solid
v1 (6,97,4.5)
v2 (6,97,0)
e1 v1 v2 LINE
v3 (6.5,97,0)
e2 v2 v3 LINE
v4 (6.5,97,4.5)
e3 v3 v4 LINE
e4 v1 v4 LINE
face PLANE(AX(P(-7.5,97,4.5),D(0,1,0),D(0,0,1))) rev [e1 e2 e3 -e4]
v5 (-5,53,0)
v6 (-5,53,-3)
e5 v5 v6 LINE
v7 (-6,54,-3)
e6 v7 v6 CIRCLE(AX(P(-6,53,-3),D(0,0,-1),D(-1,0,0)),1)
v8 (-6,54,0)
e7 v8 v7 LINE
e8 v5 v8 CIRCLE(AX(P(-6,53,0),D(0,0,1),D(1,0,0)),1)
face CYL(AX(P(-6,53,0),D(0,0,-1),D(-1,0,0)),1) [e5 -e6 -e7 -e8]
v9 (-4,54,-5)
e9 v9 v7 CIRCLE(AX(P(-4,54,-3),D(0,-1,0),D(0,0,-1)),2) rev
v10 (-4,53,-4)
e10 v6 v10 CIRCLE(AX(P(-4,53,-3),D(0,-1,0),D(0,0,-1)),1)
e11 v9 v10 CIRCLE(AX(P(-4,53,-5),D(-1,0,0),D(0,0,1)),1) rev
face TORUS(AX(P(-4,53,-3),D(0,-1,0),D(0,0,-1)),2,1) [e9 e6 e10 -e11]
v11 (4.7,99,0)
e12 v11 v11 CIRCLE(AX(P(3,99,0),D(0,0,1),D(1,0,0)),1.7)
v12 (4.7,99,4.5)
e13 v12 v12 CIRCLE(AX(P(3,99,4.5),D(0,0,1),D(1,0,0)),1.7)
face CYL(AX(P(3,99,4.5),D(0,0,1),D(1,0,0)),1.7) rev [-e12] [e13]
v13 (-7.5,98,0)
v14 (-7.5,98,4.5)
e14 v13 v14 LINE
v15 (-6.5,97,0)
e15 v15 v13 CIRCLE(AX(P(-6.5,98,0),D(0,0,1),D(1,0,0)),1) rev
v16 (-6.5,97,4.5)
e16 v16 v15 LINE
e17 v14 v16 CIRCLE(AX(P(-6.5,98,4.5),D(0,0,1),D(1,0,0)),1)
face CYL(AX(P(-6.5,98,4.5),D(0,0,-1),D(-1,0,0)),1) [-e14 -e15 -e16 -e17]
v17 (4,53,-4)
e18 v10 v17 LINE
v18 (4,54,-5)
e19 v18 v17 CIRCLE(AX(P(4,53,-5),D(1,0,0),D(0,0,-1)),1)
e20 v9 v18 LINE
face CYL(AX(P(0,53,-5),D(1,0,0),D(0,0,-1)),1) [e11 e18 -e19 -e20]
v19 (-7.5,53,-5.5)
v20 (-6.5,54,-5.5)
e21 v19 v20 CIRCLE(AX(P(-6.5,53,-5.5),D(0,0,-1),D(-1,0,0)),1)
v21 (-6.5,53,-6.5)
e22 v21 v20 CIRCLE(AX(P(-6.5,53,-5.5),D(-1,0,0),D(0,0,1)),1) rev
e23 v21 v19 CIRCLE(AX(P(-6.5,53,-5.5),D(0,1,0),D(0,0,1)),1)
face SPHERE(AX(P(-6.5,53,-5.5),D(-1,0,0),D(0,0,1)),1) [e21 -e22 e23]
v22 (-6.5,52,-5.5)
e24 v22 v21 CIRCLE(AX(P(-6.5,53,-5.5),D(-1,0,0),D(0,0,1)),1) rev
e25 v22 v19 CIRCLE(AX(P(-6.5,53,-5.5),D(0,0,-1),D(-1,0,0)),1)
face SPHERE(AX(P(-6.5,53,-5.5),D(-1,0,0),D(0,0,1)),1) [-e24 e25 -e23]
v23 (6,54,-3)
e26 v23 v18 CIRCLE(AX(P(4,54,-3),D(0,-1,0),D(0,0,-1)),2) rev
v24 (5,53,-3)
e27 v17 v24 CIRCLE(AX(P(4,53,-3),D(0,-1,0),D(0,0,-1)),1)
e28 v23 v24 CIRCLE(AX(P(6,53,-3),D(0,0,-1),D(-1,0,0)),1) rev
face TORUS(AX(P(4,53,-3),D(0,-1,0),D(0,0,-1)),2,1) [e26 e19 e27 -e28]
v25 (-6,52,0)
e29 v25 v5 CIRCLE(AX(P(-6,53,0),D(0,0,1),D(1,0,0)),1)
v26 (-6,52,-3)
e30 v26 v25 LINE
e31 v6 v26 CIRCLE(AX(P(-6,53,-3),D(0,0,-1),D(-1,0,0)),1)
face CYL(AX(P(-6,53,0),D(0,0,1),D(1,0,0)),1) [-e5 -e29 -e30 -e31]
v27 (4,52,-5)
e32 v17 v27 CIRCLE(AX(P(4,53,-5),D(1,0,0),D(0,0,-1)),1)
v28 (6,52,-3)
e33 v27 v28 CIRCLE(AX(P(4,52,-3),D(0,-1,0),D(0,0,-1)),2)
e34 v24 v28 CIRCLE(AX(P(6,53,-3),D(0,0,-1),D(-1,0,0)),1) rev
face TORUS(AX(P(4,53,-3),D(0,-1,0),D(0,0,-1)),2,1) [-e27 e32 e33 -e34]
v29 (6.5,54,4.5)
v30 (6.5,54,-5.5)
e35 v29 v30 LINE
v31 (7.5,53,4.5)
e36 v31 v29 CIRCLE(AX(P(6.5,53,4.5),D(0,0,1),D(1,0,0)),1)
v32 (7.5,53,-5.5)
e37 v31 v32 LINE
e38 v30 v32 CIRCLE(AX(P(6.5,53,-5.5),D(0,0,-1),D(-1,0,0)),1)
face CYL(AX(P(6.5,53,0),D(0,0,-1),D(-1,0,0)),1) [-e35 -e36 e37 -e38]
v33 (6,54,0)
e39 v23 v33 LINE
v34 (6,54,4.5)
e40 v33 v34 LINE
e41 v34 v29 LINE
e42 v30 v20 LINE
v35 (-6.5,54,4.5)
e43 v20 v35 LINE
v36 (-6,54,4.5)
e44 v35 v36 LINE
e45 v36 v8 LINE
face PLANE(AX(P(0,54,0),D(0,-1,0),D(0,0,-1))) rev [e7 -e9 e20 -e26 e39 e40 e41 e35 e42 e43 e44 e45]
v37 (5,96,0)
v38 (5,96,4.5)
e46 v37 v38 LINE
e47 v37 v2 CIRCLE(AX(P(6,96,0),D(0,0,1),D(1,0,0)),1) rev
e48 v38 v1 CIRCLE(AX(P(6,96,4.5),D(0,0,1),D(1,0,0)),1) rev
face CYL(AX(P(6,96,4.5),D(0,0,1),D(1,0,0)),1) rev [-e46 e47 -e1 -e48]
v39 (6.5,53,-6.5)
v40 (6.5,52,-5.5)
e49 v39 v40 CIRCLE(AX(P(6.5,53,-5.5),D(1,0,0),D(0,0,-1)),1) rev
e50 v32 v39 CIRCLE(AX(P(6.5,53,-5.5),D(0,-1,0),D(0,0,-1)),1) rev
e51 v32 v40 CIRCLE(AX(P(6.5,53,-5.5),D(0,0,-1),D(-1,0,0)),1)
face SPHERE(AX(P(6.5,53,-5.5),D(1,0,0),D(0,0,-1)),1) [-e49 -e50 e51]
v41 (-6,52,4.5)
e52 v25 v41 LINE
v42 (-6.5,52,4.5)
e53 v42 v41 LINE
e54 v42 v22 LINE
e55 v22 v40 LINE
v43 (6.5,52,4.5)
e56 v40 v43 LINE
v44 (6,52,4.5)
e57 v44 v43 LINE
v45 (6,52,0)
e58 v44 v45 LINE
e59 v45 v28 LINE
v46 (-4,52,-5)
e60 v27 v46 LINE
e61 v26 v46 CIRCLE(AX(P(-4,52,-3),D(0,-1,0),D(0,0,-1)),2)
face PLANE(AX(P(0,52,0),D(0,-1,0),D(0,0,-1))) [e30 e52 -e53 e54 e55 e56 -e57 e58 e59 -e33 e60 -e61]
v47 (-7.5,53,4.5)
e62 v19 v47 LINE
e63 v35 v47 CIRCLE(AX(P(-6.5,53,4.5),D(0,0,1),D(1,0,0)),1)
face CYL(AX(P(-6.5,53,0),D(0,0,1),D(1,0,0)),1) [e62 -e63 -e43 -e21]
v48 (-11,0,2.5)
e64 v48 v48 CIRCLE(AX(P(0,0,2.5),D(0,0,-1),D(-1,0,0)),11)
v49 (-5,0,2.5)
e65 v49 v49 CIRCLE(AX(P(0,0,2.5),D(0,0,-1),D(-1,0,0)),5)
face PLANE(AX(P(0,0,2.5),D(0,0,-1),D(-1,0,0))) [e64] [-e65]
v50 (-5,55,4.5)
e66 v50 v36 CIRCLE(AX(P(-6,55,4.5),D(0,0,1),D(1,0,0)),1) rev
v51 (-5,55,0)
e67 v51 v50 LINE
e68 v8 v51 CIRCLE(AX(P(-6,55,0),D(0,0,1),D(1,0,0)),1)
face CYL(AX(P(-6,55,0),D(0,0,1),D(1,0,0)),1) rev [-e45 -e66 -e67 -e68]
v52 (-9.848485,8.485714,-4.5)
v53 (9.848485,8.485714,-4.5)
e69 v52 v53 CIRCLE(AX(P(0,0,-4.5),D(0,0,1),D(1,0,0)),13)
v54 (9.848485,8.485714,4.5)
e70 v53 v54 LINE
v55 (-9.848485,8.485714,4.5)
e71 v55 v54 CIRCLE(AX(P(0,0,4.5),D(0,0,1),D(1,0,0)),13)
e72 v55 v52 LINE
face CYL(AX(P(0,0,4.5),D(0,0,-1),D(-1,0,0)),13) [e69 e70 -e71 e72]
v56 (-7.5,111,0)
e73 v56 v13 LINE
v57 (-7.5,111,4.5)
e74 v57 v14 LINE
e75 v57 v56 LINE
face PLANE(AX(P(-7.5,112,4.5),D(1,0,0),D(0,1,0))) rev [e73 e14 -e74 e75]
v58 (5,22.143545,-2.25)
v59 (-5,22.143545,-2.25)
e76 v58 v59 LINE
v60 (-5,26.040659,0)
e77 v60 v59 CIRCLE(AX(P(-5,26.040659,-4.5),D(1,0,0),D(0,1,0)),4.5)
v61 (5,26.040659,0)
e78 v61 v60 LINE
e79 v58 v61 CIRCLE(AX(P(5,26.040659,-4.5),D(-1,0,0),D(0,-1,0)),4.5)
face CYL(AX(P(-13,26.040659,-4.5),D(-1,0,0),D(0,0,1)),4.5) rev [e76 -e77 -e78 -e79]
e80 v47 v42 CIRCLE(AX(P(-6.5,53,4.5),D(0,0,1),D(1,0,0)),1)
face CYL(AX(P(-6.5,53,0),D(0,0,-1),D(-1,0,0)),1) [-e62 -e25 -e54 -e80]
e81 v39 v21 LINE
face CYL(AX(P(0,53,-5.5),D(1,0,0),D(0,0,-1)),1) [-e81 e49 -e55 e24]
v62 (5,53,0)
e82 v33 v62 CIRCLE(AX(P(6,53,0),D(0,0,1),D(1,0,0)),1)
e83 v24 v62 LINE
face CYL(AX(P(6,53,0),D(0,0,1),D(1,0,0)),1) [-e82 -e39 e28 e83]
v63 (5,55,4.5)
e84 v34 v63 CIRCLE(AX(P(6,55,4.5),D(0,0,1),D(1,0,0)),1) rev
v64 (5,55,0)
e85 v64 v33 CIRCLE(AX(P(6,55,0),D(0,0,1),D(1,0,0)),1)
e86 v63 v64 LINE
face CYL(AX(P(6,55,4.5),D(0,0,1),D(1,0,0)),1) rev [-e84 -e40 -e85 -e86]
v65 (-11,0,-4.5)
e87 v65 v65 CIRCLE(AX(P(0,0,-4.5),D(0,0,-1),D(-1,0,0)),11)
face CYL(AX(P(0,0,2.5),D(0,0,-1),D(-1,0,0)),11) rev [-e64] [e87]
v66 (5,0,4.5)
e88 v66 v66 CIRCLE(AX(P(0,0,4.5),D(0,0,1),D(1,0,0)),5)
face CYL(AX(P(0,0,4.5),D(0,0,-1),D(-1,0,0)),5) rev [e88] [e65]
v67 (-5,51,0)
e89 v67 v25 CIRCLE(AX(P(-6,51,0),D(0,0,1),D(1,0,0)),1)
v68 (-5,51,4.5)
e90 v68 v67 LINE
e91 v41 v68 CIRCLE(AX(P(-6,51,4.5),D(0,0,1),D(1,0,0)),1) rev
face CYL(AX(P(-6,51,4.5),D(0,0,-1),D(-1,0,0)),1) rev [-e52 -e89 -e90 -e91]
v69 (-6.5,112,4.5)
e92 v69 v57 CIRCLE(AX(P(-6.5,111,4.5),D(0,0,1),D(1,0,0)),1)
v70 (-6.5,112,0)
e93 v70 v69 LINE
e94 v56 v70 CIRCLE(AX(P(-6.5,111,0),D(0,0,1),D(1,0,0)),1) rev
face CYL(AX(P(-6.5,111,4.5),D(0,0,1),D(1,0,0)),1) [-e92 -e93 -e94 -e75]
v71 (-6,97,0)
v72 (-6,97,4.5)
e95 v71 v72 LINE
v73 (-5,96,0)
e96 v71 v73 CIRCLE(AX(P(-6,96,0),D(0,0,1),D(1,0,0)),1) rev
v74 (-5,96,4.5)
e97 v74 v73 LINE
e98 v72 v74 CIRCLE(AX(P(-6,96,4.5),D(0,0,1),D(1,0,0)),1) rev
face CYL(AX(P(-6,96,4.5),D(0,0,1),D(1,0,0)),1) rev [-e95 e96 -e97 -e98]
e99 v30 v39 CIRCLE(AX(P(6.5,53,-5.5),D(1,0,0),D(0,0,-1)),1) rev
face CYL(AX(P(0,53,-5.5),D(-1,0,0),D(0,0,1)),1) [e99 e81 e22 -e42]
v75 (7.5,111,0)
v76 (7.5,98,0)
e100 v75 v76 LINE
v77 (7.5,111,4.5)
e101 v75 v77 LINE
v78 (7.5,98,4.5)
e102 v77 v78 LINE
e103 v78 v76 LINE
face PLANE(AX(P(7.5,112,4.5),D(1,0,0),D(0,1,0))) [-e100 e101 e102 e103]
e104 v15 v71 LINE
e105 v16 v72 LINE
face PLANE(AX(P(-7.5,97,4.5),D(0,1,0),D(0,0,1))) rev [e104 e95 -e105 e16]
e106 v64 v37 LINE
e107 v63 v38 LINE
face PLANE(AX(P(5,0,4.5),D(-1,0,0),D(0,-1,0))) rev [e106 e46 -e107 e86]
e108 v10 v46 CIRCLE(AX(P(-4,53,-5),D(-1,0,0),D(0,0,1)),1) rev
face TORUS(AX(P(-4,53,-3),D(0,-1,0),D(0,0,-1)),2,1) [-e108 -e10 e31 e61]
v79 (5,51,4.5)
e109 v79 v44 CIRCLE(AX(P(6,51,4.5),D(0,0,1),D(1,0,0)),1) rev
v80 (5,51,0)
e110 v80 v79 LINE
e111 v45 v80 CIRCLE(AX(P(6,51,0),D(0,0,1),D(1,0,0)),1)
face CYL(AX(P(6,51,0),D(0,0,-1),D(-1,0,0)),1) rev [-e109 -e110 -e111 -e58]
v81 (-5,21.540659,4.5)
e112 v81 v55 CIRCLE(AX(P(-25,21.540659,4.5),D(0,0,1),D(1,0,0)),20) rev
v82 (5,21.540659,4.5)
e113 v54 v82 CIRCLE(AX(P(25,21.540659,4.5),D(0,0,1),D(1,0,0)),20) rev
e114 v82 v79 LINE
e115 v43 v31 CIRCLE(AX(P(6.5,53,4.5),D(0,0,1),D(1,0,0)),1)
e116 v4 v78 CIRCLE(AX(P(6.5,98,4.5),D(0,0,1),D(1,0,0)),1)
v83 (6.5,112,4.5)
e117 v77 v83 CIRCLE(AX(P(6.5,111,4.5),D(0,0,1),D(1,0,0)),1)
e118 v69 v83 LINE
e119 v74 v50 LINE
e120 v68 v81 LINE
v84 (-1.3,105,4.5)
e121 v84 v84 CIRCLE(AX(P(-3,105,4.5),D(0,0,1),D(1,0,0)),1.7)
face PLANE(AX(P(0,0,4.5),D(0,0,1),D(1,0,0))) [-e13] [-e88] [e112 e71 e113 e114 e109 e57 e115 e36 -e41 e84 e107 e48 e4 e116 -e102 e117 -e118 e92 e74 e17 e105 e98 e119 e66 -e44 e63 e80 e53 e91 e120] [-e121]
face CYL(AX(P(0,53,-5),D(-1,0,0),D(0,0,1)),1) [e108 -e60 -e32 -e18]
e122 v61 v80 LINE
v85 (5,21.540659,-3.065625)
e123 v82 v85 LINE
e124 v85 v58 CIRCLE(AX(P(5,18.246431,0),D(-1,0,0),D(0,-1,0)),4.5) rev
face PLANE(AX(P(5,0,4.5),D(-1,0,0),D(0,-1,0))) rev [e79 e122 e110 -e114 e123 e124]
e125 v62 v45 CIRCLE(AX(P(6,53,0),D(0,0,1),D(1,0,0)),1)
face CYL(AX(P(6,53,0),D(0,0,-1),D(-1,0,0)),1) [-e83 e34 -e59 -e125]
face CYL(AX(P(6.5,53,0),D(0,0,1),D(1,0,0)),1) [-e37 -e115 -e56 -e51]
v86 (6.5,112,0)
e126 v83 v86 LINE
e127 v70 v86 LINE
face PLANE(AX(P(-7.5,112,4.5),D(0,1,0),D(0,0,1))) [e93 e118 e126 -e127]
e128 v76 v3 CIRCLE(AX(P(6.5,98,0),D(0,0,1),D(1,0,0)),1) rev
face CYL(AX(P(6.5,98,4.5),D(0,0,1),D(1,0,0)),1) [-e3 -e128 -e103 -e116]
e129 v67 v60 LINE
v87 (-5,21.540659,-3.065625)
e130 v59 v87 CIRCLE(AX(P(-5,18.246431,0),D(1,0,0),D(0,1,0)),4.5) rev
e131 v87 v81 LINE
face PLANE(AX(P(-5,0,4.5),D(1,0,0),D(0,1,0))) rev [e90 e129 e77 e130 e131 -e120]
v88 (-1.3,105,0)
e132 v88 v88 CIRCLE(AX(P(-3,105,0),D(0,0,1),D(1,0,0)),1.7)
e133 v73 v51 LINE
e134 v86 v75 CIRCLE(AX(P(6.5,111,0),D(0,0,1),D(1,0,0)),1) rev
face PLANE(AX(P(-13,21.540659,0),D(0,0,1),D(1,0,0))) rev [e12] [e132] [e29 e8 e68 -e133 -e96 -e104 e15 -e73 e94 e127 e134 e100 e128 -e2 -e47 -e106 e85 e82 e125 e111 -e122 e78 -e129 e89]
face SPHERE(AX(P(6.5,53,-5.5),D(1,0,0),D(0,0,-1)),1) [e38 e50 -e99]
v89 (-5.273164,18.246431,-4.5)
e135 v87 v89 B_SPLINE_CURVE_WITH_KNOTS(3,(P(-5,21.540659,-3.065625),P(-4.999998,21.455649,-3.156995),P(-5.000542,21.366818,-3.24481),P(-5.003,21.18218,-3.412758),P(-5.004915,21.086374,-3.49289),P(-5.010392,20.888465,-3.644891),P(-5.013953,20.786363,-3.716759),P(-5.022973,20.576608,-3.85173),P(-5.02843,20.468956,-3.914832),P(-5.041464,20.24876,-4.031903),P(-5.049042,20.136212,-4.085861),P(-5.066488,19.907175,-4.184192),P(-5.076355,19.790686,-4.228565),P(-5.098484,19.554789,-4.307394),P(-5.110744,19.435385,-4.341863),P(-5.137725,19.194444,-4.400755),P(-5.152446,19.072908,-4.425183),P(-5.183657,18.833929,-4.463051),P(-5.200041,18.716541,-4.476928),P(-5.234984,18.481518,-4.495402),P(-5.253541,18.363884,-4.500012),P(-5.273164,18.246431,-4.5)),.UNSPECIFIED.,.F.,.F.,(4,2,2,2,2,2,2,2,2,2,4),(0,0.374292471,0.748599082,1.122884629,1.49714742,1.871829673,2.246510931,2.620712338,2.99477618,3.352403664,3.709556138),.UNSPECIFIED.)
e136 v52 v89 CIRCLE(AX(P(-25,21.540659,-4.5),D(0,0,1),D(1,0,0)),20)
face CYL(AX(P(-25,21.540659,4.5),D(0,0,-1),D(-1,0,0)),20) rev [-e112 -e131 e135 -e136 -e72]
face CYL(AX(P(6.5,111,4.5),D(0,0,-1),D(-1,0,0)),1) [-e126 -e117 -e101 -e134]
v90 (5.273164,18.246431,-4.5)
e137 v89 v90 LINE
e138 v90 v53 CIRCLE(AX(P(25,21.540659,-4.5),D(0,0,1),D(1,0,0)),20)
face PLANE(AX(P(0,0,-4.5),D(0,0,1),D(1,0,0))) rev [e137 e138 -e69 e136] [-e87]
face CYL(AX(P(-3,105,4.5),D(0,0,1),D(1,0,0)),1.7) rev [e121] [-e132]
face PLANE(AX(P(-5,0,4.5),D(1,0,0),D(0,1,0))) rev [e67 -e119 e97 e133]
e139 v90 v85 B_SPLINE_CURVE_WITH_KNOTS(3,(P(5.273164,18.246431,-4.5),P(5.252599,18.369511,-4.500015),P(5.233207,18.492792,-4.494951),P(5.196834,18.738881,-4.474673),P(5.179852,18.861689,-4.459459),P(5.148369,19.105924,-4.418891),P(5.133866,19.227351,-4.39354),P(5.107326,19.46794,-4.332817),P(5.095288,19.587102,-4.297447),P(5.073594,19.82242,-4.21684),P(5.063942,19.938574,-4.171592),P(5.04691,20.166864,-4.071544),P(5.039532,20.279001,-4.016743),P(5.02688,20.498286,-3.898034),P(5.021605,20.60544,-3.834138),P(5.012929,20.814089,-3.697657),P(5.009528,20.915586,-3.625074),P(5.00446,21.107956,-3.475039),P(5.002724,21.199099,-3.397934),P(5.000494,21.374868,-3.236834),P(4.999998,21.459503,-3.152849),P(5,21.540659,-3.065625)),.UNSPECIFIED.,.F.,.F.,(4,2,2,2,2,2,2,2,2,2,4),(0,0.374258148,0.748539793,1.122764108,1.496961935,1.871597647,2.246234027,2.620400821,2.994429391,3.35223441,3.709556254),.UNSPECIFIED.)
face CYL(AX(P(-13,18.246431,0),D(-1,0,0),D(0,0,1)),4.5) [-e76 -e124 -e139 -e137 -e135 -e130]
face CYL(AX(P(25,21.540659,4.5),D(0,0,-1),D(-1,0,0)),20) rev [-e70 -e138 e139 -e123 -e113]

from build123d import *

# Parameters (mm, degrees)
SKETCH1_R               = 13
SKETCH1_R_2             = 5
SKETCH1_W               = 10
SKETCH1_H               = 100
SKETCH1_W_2             = 15
SKETCH1_H_2             = 15
BOSS_EXTRUDE1_DEPTH     = 4.5
SKETCH2_R               = 11
CUT_EXTRUDE1_DEPTH      = 7
FILLET7_R               = 1
FILLET1_R               = 20
CUT_EXTRUDE2_DEPTH      = 113.841703284
CUT_EXTRUDE2_DEPTH_BACK = 113.841703284
SKETCH3_W               = 4.5
SKETCH3_H               = 90.459340771
M3_CLEARANCE_HOLE1_D    = 3.4
FILLET5_R               = 4.5
FILLET6_R               = 4.5
BOSS_EXTRUDE2_DEPTH     = 2
FILLET8_R               = 1
FILLET9_R               = 1


# Some blends are built 0.0001 mm under size
with BuildPart() as part:
    # Sketch1 → Boss-Extrude1 (new, symmetric)
    # profile 1 of 3: a face of its own
    with BuildSketch(Plane.XY):
        Circle(SKETCH1_R)
        Circle(SKETCH1_R_2, mode=Mode.SUBTRACT)
    # profile 2 of 3: a face of its own
    with BuildSketch(Plane.XY):
        with Locations((0, 62)):
            Rectangle(SKETCH1_W, SKETCH1_H)
    # profile 3 of 3: a face of its own
    with BuildSketch(Plane.XY):
        with Locations((0, 104.5)):
            Rectangle(SKETCH1_W_2, SKETCH1_H_2)
    extrude(amount=BOSS_EXTRUDE1_DEPTH, both=True)

    # Sketch2 → Cut-Extrude1 (cut)
    with BuildSketch(Plane(origin=(0, 0, -4.5), x_dir=(-1, 0, 0), z_dir=(0, 0, -1))):
        Circle(SKETCH2_R)
    extrude(amount=-CUT_EXTRUDE1_DEPTH, mode=Mode.SUBTRACT)

    # Fillet7
    fillet7_edges = [part.edges().sort_by_distance(p)[0] for p in [
        (-5, 97, 0),
        (5, 97, 0),
        (7.5, 97, 0),
        (7.5, 112, 0),
        (-7.5, 112, 0),
        (-7.5, 97, 0),
    ]]
    fillet(fillet7_edges, radius=FILLET7_R)

    # Fillet1
    fillet1_edges = [part.edges().sort_by_distance(p)[0] for p in [
        (-5, 12, 0),
        (5, 12, 0),
    ]]
    fillet(fillet1_edges, radius=FILLET1_R)

    # Sketch3 → Cut-Extrude2 (cut, two sides: drawn at the far end of the back side and taken through both)
    with BuildSketch(Plane(origin=(0, 0, 0), x_dir=(0, 0, -1), z_dir=(1, 0, 0)).offset(-CUT_EXTRUDE2_DEPTH_BACK)):
        with Locations((2.25, 66.770329614)):
            Rectangle(SKETCH3_W, SKETCH3_H)
    extrude(amount=CUT_EXTRUDE2_DEPTH + CUT_EXTRUDE2_DEPTH_BACK, mode=Mode.SUBTRACT)

    # M3 Clearance Hole1 (through all)
    with Locations(Plane.XY.offset(4.5)):
        with Locations((3, 99), (-3, 105)):
            Hole(M3_CLEARANCE_HOLE1_D / 2)

    # Fillet5
    fillet5_edges = [part.edges().sort_by_distance(p)[0] for p in [
        (0, 21.540659229, 0),
    ]]
    fillet(fillet5_edges, radius=FILLET5_R - 0.0001)  # a hair under: the kernel refuses the full size

    # Fillet6
    # the kernel refuses this fillet: 4.5 mm, written as the material it takes off along each edge
    with BuildSketch(Plane(origin=(-13.235677247, 21.540659229, -4.5), x_dir=(0, -1, 0), z_dir=(1, 0, 0))) as fillet6_piece_1:
        with BuildLine():
            CenterArc((3.294270899, -4.5), FILLET6_R, 90, 60.000367556)
            Line((-0.602857852, -2.250025), (-0.992570727, -2.0250275))
            ThreePointArc((-0.992570727, -2.0250275), (-0.45, -0.0001), (-0.45, 0))
            Line((-0.45, 0), (0, 0.45))
            Line((0, 0.45), (3.294270899, 0.45))
            Line((3.294270899, 0.45), (3.294270899, 0))
        make_face()
    extrude(amount=26.471354494, mode=Mode.SUBTRACT)

    # Sketch10 → Boss-Extrude2 (add)
    with BuildSketch(Plane(origin=(0, 52, 0), x_dir=(-1, 0, 0), z_dir=(0, -1, 0))):
        Polygon((5, -4.5), (7.5, -4.5), (7.5, 6.5), (-7.5, 6.5), (-7.5, -4.5), (-5, -4.5), (-5, 4), (5, 4), align=None)
    extrude(amount=-BOSS_EXTRUDE2_DEPTH)

    # Fillet8
    fillet8_edges = [part.edges().sort_by_distance(p)[0] for p in [
        (-5, 52, -2),
        (5, 54, -2),
        (5, 53, -4),
        (7.5, 52, -1),
        (0, 54, -6.5),
        (7.5, 53, -6.5),
        (-7.5, 54, -1),
        (-7.5, 53, -6.5),
        (0, 52, -4),
        (-5, 53, -4),
        (7.5, 54, -1),
        (-5, 54, -2),
        (0, 54, -4),
        (5, 52, -2),
        (-7.5, 52, -1),
        (0, 52, -6.5),
    ]]
    fillet(fillet8_edges, radius=FILLET8_R - 0.0001)  # a hair under: the kernel refuses the full size

    # Fillet9
    fillet9_edges = [part.edges().sort_by_distance(p)[0] for p in [
        (5, 54, 2.25),
        (-5, 54, 2.25),
        (-5, 52, 2.25),
        (5, 52, 2.25),
    ]]
    fillet(fillet9_edges, radius=FILLET9_R - 0.0001)  # a hair under: the kernel refuses the full size


solid = part.part
